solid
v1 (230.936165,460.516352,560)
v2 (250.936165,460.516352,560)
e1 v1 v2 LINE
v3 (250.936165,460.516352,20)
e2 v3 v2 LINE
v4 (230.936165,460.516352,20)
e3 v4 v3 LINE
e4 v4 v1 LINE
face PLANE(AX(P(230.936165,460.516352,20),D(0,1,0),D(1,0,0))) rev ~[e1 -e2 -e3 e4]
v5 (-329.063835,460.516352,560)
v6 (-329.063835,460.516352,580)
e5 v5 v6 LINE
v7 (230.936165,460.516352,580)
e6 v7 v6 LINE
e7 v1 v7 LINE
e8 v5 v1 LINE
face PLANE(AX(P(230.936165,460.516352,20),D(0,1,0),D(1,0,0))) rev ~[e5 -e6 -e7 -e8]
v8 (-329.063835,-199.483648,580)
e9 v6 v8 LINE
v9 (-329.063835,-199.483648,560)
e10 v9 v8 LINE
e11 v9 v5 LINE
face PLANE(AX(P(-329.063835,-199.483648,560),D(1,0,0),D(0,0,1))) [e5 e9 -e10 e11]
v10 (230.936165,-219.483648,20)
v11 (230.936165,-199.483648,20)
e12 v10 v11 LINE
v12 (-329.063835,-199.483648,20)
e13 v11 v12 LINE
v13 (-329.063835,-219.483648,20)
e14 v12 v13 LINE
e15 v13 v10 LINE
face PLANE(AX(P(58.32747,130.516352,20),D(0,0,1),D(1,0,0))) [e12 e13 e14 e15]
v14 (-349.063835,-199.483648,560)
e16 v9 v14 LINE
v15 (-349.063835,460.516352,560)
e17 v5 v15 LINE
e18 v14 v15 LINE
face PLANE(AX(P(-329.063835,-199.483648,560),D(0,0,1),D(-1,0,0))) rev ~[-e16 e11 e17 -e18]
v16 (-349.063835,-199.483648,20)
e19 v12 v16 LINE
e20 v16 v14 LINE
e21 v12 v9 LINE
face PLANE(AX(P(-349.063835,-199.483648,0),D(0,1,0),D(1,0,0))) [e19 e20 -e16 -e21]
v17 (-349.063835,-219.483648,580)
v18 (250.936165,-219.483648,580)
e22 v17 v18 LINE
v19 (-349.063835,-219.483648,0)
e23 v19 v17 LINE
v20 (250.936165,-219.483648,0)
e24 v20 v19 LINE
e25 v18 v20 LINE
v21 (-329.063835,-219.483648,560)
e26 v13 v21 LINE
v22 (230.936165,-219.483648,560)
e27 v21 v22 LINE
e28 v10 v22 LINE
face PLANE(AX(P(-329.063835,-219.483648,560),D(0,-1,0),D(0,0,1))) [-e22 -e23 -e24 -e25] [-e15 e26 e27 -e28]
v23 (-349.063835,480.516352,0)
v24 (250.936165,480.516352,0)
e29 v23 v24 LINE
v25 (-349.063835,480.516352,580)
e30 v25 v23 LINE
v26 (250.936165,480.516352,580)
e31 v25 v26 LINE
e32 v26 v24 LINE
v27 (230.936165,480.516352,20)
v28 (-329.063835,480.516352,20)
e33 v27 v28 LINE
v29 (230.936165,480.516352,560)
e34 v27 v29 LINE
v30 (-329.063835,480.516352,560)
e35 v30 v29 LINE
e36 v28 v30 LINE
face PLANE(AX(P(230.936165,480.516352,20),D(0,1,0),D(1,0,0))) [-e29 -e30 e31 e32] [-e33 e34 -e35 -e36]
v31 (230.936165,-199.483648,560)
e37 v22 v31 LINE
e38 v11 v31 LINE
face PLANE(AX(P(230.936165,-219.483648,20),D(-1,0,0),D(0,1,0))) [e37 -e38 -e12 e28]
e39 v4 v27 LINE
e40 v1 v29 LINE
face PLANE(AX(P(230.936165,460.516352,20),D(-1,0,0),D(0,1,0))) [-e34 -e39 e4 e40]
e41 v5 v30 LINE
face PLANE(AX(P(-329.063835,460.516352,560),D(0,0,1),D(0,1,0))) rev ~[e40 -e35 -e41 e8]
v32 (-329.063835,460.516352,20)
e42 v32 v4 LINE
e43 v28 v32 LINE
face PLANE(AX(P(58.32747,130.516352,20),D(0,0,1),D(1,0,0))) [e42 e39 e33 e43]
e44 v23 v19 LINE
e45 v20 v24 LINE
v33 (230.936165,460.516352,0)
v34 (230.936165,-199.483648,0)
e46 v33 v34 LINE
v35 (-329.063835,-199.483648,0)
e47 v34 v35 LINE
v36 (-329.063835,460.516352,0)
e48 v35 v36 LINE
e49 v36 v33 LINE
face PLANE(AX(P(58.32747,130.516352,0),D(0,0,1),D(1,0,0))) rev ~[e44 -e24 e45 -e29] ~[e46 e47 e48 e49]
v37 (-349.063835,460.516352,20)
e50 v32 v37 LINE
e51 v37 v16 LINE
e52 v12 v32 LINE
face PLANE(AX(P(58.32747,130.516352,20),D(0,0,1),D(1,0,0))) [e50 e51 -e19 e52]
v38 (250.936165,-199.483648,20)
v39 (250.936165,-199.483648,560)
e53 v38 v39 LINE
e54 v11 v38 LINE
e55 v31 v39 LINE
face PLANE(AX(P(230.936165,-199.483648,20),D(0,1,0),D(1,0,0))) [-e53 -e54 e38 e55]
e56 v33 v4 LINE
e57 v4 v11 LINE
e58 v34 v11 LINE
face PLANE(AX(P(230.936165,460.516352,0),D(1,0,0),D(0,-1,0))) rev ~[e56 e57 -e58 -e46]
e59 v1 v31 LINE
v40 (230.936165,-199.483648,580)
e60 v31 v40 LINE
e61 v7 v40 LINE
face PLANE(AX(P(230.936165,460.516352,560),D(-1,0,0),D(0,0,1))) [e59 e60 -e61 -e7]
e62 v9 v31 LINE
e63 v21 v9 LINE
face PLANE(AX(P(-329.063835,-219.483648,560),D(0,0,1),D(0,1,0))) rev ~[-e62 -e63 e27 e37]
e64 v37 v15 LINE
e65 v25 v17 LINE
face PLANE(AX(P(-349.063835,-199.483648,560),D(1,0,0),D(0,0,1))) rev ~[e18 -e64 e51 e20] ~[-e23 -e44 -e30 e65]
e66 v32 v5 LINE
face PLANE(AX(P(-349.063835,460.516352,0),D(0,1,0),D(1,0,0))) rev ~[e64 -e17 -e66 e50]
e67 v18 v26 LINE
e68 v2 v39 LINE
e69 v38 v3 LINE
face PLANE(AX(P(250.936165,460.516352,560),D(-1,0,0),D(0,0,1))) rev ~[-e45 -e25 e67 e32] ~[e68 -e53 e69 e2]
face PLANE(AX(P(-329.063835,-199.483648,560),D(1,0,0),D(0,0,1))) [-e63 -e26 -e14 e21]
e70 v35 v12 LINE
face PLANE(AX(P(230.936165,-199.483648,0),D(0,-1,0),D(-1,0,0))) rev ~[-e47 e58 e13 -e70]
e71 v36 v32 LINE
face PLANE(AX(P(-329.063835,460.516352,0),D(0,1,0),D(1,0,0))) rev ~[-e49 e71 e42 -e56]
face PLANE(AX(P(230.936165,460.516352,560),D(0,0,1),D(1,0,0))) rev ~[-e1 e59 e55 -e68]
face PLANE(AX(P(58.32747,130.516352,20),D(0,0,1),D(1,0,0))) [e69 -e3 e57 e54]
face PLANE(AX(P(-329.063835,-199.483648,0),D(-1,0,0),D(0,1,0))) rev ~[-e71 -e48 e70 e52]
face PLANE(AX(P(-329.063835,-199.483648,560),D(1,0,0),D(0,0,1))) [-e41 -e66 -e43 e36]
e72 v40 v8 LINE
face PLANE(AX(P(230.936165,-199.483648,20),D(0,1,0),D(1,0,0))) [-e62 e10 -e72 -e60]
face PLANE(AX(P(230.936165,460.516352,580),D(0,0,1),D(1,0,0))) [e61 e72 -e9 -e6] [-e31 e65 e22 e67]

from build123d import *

# Parameters (mm, degrees)
F0_W      = 20
F0_H      = 660
F0_H_2    = 20
F1_DEPTH  = 20
F2_DEPTH  = 580
F3_W      = 20
F3_H      = 20
F4_DEPTH  = 660
F5_W      = 20
F5_H      = 20
F6_DEPTH  = 560
F7_W      = 20
F7_H      = 20
F8_DEPTH  = 560
F9_W      = 20
F9_H      = 20
F10_DEPTH = 660


# Not quite as in the source:
# - a feature names something its author has since deleted; it is built from what else it names


with BuildPart() as f1:
    # F0 (on Top) → F1 (new body)
    with BuildSketch(Plane.XY):
        Polygon((250.936165452, 480.5163520575), (-329.063834548, 480.5163520575), (-329.063834548, 460.5163520575), (230.936165452, 460.5163520575), (230.936165452, -199.4836479425), (-329.063834548, -199.4836479425), (-329.063834548, -219.4836479425), (250.936165452, -219.4836479425), align=None)
        with Locations((-339.063834548, 130.5163520575)):
            Rectangle(F0_W, F0_H)
        with Locations((-339.063834548, 470.5163520575)):
            Rectangle(F0_W, F0_H_2)
        with Locations((-339.063834548, -209.4836479425)):
            Rectangle(F0_W, F0_H_2)
    extrude(amount=F1_DEPTH)

    # F0 (on Top) → F2 (join)
    with BuildSketch(Plane.XY):
        with Locations((-339.063834548, 470.5163520575)):
            Rectangle(F0_W, F0_H_2)
        with Locations((-339.063834548, -209.4836479425)):
            Rectangle(F0_W, F0_H_2)
    extrude(amount=F2_DEPTH)

    # F3 (on face) → F4 (join)
    with BuildSketch(Plane(origin=(0, -199.4836479425, 0), x_dir=(-1, 0, 0), z_dir=(0, 1, 0))):
        with Locations((339.063834548, 570)):
            Rectangle(F3_W, F3_H)
    extrude(amount=F4_DEPTH)

    # F5 (on face) → F6 (join)
    with BuildSketch(Plane.YZ.offset(-329.063834548)):
        with Locations((-209.4836479425, 570)):
            Rectangle(F5_W, F5_H)
        with Locations((470.5163520575, 570)):
            Rectangle(F5_W, F5_H)
    extrude(amount=F6_DEPTH)

    # F7 (on face) → F8 (join)
    with BuildSketch(Plane.XY.offset(20)):
        with Locations((240.936165452, 470.5163520575)):
            Rectangle(F7_W, F7_H)
        with Locations((240.936165452, -209.4836479425)):
            Rectangle(F7_W, F7_H)
    extrude(amount=F8_DEPTH)

    # F9 (on face) → F10 (join)
    with BuildSketch(Plane.XZ.offset(-460.5163520575)):
        with Locations((240.936165452, 570)):
            Rectangle(F9_W, F9_H)
    extrude(amount=F10_DEPTH)


solid = f1.part
